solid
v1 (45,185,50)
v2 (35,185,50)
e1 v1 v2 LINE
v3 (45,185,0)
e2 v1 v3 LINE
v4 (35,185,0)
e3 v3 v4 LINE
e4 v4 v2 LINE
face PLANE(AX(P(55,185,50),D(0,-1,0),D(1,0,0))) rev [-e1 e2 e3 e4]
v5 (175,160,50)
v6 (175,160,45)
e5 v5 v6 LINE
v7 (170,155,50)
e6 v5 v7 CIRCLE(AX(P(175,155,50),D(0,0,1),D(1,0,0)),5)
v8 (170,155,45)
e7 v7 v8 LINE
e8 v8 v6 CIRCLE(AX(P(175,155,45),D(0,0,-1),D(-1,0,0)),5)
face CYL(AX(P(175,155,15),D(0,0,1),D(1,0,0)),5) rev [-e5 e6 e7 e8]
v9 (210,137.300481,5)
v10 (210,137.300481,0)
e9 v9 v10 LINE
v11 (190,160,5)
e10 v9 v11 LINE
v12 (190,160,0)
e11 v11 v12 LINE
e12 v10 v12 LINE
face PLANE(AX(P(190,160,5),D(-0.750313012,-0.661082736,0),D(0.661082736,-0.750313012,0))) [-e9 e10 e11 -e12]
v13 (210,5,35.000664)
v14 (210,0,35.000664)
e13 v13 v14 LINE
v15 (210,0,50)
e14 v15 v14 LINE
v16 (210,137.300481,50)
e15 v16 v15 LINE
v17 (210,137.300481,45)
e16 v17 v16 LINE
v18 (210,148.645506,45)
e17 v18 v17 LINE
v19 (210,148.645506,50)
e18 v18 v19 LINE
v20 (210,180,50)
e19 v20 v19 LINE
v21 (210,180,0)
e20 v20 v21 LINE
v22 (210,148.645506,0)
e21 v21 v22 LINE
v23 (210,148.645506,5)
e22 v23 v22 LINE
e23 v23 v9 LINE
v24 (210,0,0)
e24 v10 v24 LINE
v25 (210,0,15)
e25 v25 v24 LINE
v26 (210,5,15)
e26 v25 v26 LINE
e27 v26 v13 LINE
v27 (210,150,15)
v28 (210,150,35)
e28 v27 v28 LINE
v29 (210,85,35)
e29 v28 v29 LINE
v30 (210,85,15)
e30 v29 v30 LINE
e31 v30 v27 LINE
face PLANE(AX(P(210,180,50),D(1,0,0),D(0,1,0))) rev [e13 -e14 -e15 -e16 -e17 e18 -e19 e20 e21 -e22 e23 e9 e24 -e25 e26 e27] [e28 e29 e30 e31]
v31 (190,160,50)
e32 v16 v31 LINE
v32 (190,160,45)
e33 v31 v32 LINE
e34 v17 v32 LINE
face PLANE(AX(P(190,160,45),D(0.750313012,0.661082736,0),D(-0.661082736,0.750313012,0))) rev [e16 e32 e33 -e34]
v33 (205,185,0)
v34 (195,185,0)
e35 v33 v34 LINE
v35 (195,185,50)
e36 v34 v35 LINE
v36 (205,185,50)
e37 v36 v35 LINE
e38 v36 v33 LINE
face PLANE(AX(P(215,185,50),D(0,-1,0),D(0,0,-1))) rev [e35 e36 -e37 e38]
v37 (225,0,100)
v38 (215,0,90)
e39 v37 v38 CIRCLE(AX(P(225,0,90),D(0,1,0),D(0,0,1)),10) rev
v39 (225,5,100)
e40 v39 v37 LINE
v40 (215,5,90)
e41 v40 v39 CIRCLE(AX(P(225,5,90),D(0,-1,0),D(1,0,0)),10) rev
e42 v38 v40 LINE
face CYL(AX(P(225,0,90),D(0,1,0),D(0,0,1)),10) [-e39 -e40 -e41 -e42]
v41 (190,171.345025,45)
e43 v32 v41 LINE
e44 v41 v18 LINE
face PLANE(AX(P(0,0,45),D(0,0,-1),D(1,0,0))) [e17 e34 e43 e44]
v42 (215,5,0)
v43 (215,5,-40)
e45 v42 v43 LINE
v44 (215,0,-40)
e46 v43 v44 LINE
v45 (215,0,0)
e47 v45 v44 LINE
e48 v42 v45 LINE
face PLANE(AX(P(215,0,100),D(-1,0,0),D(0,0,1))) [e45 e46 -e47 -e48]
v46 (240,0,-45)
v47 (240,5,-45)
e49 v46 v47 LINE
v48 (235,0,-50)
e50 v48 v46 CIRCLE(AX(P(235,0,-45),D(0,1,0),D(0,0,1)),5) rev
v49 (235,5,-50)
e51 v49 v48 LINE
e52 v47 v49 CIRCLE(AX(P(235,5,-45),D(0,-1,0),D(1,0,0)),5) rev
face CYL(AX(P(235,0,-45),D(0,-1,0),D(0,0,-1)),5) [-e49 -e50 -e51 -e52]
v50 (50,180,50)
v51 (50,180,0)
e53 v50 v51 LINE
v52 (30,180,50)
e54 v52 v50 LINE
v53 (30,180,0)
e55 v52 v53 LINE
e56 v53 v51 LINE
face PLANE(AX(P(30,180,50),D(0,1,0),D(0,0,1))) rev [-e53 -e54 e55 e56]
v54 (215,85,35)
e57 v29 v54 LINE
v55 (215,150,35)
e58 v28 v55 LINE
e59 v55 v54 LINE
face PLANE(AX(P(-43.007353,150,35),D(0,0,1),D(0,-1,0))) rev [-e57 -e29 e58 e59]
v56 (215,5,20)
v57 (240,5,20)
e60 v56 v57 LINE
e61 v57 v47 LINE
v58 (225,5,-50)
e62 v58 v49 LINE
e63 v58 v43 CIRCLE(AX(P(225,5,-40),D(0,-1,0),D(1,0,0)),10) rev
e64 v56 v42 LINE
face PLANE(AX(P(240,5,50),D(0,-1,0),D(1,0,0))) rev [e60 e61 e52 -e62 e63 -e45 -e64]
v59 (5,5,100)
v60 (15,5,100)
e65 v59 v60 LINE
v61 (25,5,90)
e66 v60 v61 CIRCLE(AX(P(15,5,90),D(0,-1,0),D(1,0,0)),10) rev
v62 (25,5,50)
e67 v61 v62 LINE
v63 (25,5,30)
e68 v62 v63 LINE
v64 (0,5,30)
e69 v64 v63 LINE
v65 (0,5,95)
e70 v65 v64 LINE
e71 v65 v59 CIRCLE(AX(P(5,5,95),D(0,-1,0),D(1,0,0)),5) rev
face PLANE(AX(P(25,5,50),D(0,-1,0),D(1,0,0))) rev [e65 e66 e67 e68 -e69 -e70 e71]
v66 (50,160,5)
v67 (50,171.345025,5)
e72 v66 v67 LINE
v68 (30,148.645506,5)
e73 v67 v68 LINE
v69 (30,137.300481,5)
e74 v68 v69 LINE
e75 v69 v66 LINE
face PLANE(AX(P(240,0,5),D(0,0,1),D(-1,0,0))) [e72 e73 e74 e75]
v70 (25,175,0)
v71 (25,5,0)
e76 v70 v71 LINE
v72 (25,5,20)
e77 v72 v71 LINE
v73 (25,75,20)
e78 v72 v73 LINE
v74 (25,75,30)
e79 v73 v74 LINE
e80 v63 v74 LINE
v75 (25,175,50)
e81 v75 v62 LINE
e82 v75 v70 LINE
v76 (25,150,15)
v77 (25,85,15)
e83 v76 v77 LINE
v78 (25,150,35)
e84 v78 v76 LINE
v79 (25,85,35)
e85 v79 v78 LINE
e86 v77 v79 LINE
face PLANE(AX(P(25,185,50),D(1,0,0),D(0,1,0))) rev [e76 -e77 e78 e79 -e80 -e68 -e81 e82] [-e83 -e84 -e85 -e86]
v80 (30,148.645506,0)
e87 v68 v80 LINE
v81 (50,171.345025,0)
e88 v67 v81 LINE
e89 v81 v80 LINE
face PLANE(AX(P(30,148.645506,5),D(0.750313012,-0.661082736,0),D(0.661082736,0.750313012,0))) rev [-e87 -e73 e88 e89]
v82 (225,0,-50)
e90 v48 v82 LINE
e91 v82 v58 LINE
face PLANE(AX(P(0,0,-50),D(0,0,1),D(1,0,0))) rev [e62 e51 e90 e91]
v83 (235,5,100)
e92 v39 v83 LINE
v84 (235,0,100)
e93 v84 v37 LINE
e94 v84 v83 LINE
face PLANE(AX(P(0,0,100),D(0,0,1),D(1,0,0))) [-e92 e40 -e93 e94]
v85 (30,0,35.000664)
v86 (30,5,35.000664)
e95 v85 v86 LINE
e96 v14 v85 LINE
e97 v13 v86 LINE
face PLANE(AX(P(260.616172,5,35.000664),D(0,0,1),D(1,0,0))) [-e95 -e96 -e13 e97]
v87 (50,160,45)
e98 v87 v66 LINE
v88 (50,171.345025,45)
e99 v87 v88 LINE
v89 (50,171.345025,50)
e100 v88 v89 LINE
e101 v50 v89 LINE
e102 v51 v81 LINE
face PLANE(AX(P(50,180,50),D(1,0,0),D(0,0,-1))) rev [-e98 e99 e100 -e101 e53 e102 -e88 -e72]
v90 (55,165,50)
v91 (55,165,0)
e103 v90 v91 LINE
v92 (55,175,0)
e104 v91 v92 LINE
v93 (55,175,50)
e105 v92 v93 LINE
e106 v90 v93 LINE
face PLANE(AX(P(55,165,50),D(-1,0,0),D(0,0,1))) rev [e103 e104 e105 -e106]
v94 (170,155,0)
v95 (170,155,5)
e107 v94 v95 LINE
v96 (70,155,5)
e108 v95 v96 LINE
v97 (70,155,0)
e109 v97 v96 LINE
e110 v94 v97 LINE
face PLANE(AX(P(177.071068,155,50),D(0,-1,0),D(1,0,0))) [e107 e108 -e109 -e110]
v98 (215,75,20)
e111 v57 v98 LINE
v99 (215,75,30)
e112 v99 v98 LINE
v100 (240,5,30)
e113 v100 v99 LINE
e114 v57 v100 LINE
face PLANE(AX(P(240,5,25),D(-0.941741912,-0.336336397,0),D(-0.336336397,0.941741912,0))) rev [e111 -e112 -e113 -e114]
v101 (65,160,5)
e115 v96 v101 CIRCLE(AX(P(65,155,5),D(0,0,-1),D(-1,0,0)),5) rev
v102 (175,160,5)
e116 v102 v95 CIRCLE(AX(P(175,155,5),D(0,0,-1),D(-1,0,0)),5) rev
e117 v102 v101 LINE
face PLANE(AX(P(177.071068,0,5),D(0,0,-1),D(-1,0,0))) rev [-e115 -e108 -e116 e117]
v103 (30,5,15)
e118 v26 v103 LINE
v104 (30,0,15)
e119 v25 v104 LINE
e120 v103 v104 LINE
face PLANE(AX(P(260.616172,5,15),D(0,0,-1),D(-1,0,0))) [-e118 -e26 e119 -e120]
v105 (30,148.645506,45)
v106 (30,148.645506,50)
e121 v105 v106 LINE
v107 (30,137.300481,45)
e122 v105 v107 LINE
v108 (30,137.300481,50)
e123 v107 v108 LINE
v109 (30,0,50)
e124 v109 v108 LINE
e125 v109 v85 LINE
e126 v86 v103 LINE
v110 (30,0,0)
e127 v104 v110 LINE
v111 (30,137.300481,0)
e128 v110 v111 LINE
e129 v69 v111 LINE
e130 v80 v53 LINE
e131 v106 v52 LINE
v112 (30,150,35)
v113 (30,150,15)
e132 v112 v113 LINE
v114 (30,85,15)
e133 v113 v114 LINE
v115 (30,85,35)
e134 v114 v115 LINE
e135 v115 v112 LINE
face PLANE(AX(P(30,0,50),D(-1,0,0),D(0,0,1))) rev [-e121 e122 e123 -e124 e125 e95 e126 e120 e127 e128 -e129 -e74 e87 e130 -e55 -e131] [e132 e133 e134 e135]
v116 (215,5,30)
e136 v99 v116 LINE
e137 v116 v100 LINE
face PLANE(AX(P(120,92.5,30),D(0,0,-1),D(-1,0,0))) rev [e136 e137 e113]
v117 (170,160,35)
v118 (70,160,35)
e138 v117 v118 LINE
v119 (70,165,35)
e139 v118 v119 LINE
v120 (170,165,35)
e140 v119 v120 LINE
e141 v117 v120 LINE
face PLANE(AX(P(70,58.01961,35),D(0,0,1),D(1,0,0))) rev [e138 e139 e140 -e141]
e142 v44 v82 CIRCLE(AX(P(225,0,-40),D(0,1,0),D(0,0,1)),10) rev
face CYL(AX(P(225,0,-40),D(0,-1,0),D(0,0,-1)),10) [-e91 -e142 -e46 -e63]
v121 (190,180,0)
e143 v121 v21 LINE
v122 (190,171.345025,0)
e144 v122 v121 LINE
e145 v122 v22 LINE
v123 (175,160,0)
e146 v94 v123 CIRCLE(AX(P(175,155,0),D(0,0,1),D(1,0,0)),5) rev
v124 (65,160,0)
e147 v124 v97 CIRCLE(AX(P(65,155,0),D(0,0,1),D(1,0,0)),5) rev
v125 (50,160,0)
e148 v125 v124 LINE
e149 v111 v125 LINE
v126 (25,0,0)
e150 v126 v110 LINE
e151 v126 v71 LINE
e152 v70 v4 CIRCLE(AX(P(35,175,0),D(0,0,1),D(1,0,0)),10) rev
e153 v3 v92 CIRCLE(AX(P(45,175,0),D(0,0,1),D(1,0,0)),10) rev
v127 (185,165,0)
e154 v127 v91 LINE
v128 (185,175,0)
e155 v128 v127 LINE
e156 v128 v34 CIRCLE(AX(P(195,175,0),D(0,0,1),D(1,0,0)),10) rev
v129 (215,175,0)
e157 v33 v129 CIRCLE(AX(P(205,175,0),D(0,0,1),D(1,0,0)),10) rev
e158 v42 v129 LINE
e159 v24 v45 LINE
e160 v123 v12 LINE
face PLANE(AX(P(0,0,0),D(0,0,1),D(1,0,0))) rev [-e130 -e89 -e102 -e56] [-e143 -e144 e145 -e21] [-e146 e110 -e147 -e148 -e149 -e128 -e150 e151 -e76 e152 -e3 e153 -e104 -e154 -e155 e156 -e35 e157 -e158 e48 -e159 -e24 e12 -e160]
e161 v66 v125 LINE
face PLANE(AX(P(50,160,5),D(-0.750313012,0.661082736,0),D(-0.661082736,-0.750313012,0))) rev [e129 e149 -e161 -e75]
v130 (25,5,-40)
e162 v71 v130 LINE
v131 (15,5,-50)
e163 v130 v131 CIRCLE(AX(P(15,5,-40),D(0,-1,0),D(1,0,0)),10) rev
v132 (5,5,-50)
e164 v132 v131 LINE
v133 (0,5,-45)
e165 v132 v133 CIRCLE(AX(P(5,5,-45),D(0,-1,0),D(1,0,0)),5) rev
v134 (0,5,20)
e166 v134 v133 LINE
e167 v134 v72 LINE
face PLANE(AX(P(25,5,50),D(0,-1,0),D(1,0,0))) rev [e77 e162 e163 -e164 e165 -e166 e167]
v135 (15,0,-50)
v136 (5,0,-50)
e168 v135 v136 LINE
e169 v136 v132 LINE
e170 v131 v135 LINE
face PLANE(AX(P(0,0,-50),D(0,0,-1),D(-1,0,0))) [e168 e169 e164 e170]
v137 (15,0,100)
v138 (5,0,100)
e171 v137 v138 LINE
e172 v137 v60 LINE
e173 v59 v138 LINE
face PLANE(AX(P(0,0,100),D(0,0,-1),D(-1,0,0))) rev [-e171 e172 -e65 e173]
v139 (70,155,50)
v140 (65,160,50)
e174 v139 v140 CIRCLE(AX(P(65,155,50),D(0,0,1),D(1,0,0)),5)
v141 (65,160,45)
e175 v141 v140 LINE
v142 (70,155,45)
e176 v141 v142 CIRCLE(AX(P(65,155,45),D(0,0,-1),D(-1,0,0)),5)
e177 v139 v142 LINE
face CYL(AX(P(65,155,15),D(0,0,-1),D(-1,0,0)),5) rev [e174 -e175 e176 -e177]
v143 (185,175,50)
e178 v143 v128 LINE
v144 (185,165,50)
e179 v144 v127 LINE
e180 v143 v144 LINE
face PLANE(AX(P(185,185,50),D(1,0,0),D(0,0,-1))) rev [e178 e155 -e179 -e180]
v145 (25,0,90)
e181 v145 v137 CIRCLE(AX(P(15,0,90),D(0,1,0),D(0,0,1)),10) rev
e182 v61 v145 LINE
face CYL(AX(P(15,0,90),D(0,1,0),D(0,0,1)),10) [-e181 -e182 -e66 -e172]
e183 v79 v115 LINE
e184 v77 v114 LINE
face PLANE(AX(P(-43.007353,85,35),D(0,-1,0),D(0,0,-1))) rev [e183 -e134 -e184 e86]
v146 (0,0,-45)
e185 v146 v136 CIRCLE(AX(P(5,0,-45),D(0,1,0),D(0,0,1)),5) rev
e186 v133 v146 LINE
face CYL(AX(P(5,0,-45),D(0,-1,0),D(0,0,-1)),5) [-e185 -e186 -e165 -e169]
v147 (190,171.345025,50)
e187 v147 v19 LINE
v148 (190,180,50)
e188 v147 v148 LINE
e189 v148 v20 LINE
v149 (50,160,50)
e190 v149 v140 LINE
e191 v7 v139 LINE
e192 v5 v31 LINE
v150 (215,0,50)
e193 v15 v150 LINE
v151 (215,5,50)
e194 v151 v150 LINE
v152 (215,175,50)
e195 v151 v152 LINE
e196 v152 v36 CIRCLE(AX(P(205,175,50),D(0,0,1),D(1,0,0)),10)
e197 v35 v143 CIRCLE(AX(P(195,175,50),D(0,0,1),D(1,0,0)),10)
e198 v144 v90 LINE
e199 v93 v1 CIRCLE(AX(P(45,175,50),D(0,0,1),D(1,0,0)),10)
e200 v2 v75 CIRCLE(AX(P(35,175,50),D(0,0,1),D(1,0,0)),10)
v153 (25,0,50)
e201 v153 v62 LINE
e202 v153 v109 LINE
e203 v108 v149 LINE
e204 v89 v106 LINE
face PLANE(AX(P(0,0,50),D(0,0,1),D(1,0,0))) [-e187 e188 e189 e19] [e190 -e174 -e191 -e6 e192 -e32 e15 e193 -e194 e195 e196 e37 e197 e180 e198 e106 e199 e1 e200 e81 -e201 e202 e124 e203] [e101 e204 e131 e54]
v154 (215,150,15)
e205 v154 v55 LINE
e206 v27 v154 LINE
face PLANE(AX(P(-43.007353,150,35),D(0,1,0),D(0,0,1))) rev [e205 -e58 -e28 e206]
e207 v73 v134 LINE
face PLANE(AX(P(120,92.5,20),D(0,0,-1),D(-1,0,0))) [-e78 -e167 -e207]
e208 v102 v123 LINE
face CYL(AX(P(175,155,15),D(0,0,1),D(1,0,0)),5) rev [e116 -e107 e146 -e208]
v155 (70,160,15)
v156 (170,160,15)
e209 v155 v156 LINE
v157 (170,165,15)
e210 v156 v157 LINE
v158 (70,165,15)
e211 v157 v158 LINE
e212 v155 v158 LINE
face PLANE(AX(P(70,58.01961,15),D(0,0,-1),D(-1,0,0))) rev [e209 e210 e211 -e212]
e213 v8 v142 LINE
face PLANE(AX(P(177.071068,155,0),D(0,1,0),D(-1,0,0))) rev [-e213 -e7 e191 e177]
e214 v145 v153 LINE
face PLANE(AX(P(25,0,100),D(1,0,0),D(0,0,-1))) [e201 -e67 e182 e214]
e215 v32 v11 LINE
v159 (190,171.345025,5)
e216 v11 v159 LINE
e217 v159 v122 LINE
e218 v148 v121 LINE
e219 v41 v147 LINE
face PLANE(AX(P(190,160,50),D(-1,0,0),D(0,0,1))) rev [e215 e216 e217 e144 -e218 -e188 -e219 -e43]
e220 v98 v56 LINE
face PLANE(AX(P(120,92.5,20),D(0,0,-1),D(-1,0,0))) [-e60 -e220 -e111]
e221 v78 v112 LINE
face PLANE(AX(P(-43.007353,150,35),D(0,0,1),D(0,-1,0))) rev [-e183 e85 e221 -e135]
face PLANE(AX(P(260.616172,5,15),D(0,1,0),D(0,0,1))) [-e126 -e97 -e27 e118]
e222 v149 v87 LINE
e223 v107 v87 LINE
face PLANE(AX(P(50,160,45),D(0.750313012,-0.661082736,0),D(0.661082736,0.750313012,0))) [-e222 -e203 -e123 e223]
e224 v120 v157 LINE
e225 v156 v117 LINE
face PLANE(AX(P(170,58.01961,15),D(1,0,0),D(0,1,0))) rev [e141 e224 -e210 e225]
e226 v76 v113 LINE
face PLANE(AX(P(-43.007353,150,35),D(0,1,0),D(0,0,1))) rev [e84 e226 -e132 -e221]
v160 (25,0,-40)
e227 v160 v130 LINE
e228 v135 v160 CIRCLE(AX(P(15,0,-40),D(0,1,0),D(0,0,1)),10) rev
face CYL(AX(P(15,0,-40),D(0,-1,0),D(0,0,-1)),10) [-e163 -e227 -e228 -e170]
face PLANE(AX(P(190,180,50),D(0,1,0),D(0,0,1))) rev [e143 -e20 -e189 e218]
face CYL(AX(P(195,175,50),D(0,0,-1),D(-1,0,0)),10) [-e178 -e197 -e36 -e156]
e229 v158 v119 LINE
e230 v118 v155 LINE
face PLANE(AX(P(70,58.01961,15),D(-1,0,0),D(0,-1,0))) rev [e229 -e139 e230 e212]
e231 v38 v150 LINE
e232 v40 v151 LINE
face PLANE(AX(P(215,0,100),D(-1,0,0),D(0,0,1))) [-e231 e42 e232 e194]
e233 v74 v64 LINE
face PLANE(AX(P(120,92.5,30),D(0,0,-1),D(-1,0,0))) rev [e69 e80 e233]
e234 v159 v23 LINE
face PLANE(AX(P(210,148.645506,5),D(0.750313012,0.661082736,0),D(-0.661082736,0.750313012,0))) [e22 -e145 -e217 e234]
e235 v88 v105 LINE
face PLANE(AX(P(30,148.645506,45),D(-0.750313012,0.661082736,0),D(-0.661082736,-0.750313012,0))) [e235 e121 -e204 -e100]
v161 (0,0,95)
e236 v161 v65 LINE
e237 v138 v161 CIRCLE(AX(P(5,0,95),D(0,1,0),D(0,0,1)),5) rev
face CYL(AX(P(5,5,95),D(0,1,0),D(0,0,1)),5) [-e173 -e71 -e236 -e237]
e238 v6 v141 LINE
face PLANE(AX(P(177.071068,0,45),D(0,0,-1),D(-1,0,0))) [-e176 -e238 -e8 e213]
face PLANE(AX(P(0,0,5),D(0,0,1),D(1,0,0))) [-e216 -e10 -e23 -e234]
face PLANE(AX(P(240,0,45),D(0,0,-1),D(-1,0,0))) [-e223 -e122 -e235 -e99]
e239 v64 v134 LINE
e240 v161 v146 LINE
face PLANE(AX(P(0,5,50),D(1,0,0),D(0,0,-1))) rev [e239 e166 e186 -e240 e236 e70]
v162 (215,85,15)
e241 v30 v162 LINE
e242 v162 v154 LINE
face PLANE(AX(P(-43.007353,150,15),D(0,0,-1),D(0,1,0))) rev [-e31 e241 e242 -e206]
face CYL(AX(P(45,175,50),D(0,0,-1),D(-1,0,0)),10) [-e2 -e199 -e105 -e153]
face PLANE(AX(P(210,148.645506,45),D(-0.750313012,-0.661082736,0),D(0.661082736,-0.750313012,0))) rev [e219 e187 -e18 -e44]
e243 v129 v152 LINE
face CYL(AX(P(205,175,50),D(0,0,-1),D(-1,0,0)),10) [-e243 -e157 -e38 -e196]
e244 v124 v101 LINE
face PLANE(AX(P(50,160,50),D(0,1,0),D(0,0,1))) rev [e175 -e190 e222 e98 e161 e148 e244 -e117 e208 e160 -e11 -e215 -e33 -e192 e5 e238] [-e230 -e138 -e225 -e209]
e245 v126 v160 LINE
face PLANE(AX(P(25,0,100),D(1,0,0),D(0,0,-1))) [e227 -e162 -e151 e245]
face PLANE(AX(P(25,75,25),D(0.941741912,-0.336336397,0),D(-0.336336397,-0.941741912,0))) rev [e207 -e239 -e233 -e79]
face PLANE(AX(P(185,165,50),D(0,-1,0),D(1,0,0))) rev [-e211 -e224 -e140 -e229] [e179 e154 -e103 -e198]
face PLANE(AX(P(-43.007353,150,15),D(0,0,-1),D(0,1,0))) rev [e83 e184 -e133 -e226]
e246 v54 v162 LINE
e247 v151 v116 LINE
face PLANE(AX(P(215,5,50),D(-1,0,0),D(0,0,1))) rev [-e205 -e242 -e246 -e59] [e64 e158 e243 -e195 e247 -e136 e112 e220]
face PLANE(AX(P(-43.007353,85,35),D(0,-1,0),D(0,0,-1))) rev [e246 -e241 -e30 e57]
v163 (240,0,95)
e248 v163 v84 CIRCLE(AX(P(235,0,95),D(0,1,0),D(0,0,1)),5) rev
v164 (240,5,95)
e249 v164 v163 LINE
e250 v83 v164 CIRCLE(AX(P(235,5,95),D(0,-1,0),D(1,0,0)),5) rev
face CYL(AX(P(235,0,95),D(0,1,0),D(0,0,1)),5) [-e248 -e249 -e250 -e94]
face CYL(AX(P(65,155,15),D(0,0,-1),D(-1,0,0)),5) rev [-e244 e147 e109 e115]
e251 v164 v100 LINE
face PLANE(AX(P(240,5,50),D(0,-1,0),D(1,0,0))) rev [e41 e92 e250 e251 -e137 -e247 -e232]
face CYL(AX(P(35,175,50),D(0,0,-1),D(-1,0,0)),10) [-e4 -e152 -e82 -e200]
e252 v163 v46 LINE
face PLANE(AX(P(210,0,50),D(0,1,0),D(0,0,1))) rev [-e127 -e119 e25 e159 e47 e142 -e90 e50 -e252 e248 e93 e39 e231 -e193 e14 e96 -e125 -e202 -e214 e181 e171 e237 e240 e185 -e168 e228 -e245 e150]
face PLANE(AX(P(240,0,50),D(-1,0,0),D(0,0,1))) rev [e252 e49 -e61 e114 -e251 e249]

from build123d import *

# Parameters (mm, degrees)
EXTRUDE_1_DEPTH             = 50
SKETCH_2_W                  = 20.000664015
SKETCH_2_H                  = 5
EXTRUDE_2_DEPTH             = 240
EXTRUDE_3_DEPTH             = 50
EXTRUDE_3_DEPTH_BACK        = 100
SKETCH_3_W                  = 25
SKETCH_3_H                  = 5
RIB_2_REACH                 = 314.17
SKETCH_4_WALL_W             = 700.669994888
SKETCH_4_WALL_H             = 10
RIB_3_REACH                 = 314.17
SKETCH_5_WALL_W             = 700.669994888
SKETCH_5_WALL_H             = 10
CUT_EXTRUDE_START           = -190
SKETCH_6_W                  = 20
SKETCH_6_H                  = 65
CUT_EXTRUDE_1_DEPTH         = 190
SKETCH_7_W                  = 100
SKETCH_7_H                  = 20
CUT_EXTRUDE_2_DEPTH         = 5
EXTRUDE_5_DEPTH             = 5
MIRROR_2_COPY_1_DEPTH       = 5
EXTRUDE_6_REACH             = 244.126
SKETCH_10_W                 = 5
SKETCH_10_H                 = 5
EXTRUDE_6_DIRECTION_2_REACH = 244.126
FILLET_1_R                  = 5
FILLET_2_R                  = 5
FILLET_3_R                  = 5
FILLET_4_R                  = 5
FILLET_5_R                  = 10
FILLET_6_R                  = 5


with BuildPart() as part:
    # 草图1 → 凸台-拉伸1 (new body)
    with BuildSketch(Plane.XY):
        Polygon((0, 0), (30, 0), (30, 180), (50, 180), (50, 160), (190, 160), (190, 180), (210, 180), (210, 0), (240, 0), (240, 5), (215, 5), (215, 185), (185, 185), (185, 165), (55, 165), (55, 185), (25, 185), (25, 5), (0, 5), align=None)
    extrude(amount=EXTRUDE_1_DEPTH)

    # 草图2 → 凸台-拉伸2 (add)
    with BuildSketch(Plane.ZY):
        with Locations((25.000332008, 2.5)):
            Rectangle(SKETCH_2_W, SKETCH_2_H)
    extrude(amount=-EXTRUDE_2_DEPTH)

    # 草图3 → 凸台-拉伸3 (add, two sides: drawn at the far end of the back side and taken through both)
    with BuildSketch(Plane(origin=(0, 0, 0), x_dir=(-1, 0, 0), z_dir=(0, 0, -1)).offset(-EXTRUDE_3_DEPTH_BACK)):
        with Locations((-227.5, 2.5)):
            Rectangle(SKETCH_3_W, SKETCH_3_H)
        with Locations((-12.5, 2.5)):
            Rectangle(SKETCH_3_W, SKETCH_3_H)
    extrude(amount=EXTRUDE_3_DEPTH + EXTRUDE_3_DEPTH_BACK)

    # 草图4 wall → 筋2 (add, up to next)
    with BuildSketch(Plane(origin=(227.5, 40, 25), x_dir=(-0.336336396998, 0.941741911595, 0), z_dir=(0.941741911595, 0.336336396998, 0)), mode=Mode.PRIVATE) as rib_2_sk1:
        Rectangle(SKETCH_4_WALL_W, SKETCH_4_WALL_H)
    rib_2_tool1 = extrude(rib_2_sk1.sketch, amount=-RIB_2_REACH, mode=Mode.PRIVATE) - part.part
    add(rib_2_tool1.solids().sort_by_distance((227.5, 40, 25))[0])

    # 草图5 wall → 筋3 (add, up to next)
    with BuildSketch(Plane(origin=(12.5, 40, 25), x_dir=(-0.336336396998, -0.941741911595, 0), z_dir=(-0.941741911595, 0.336336396998, 0)), mode=Mode.PRIVATE) as rib_3_sk1:
        Rectangle(SKETCH_5_WALL_W, SKETCH_5_WALL_H)
    rib_3_tool1 = extrude(rib_3_sk1.sketch, amount=-RIB_3_REACH, mode=Mode.PRIVATE) - part.part
    add(rib_3_tool1.solids().sort_by_distance((12.5, 40, 25))[0])

    # 草图6 → 切除-拉伸1 (cut)
    with BuildSketch(Plane(origin=(215, 0, 0), x_dir=(0, 0, -1), z_dir=(1, 0, 0)).offset(CUT_EXTRUDE_START)):
        with Locations((-25, 117.5)):
            Rectangle(SKETCH_6_W, SKETCH_6_H)
    extrude(amount=CUT_EXTRUDE_1_DEPTH, mode=Mode.SUBTRACT)

    # 草图7 → 切除-拉伸2 (cut)
    with BuildSketch(Plane(origin=(0, 165, 0), x_dir=(1, 0, 0), z_dir=(0, 1, 0))):
        with Locations((120, -25)):
            Rectangle(SKETCH_7_W, SKETCH_7_H)
    extrude(amount=-CUT_EXTRUDE_2_DEPTH, mode=Mode.SUBTRACT)

    # 草图9 → 凸台-拉伸5 (add)
    with BuildSketch(Plane(origin=(0, 0, 0), x_dir=(-1, 0, 0), z_dir=(0, 0, -1))):
        Polygon((-190, 160), (-210, 137.300480815), (-210, 148.645505565), (-190, 171.34502475), align=None)
    extrude_5 = extrude(amount=-EXTRUDE_5_DEPTH)

    # 镜向1: 凸台-拉伸5 across plane
    add(extrude_5.mirror(Plane(origin=(0, 0, 25), x_dir=(1, 0, 0), z_dir=(0, 0, -1))))

    # 镜向2: 凸台-拉伸5 across plane
    add(extrude_5.mirror(Plane(origin=(120, 0, 0), x_dir=(0, 0, 1), z_dir=(1, 0, 0))))

    # 镜向2 copy 1 sketch → 镜向2 copy 1 (add)
    with BuildSketch(Plane(origin=(240, 0, 50), x_dir=(1, 0, 0), z_dir=(0, 0, 1))):
        Polygon((-190, 160), (-210, 137.300480815), (-210, 148.645505565), (-190, 171.34502475), align=None)
    extrude(amount=-MIRROR_2_COPY_1_DEPTH)

    # 凸台-拉伸6: up to this face of the body (flat: up to its plane)
    extrude_6_end = Plane(part.part.faces().sort_by_distance((170, 162.5, 25))[0])
    # 草图10 → 凸台-拉伸6 (add, up to the picked face)
    with BuildSketch(Plane(origin=(120, 0, 0), x_dir=(0, 0, -1), z_dir=(1, 0, 0)), mode=Mode.PRIVATE) as extrude_6_sk1:
        with Locations((-47.5, 157.5)):
            Rectangle(SKETCH_10_W, SKETCH_10_H)
    extrude_6_tool1 = split(extrude(extrude_6_sk1.sketch, amount=EXTRUDE_6_REACH, mode=Mode.PRIVATE), bisect_by=extrude_6_end, keep=Keep.BOTH, mode=Mode.PRIVATE)
    extrude_6 = extrude_6_tool1.solids().sort_by(Axis((120, 157.5, 47.5), (1, 0, 0)))[0]
    add(extrude_6)

    # 凸台-拉伸6 direction 2: up to this face of the body (flat: up to its plane)
    extrude_6_direction_2_end = Plane(part.part.faces().sort_by_distance((70, 162.5, 25))[0])
    # 草图10 → 凸台-拉伸6 direction 2 (add, up to the picked face)
    with BuildSketch(Plane(origin=(120, 0, 0), x_dir=(0, 0, -1), z_dir=(1, 0, 0)), mode=Mode.PRIVATE) as extrude_6_direction_2_sk1:
        with Locations((-47.5, 157.5)):
            Rectangle(SKETCH_10_W, SKETCH_10_H)
    extrude_6_direction_2_tool1 = split(extrude(extrude_6_direction_2_sk1.sketch, amount=-EXTRUDE_6_DIRECTION_2_REACH, mode=Mode.PRIVATE), bisect_by=extrude_6_direction_2_end, keep=Keep.BOTH, mode=Mode.PRIVATE)
    extrude_6_direction_2 = extrude_6_direction_2_tool1.solids().sort_by(Axis((120, 157.5, 47.5), (-1, 0, 0)))[0]
    add(extrude_6_direction_2)

    # 镜向3: 凸台-拉伸6, 凸台-拉伸6 direction 2 across plane
    add(extrude_6.mirror(Plane(origin=(0, 0, 25), x_dir=(1, 0, 0), z_dir=(0, 0, -1))))
    add(extrude_6_direction_2.mirror(Plane(origin=(0, 0, 25), x_dir=(1, 0, 0), z_dir=(0, 0, -1))))

    # 圆角1
    fillet_1_edges = [part.edges().sort_by_distance(p)[0] for p in [
        (70, 160, 47.5),
    ]]
    fillet(fillet_1_edges, radius=FILLET_1_R - 0.0001)  # a hair under: the kernel refuses the full size

    # 圆角2
    fillet_2_edges = [part.edges().sort_by_distance(p)[0] for p in [
        (170, 160, 47.5),
    ]]
    fillet(fillet_2_edges, radius=FILLET_2_R - 0.0001)  # a hair under: the kernel refuses the full size

    # 圆角3
    fillet_3_edges = [part.edges().sort_by_distance(p)[0] for p in [
        (170, 160, 2.5),
    ]]
    fillet(fillet_3_edges, radius=FILLET_3_R - 0.0001)  # a hair under: the kernel refuses the full size

    # 圆角4
    fillet_4_edges = [part.edges().sort_by_distance(p)[0] for p in [
        (70, 160, 2.5),
    ]]
    fillet(fillet_4_edges, radius=FILLET_4_R - 0.0001)  # a hair under: the kernel refuses the full size

    # 圆角5
    fillet_5_edges = [part.edges().sort_by_distance(p)[0] for p in [
        (215, 2.5, 100),
        (215, 2.5, -50),
        (25, 2.5, 100),
        (25, 2.5, -50),
        (25, 185, 25),
        (55, 185, 25),
        (185, 185, 25),
        (215, 185, 25),
    ]]
    fillet(fillet_5_edges, radius=FILLET_5_R)

    # 圆角6
    fillet_6_edges = [part.edges().sort_by_distance(p)[0] for p in [
        (240, 2.5, 100),
        (240, 2.5, -50),
        (0, 2.5, 100),
        (0, 2.5, -50),
    ]]
    fillet(fillet_6_edges, radius=FILLET_6_R)


solid = part.part
